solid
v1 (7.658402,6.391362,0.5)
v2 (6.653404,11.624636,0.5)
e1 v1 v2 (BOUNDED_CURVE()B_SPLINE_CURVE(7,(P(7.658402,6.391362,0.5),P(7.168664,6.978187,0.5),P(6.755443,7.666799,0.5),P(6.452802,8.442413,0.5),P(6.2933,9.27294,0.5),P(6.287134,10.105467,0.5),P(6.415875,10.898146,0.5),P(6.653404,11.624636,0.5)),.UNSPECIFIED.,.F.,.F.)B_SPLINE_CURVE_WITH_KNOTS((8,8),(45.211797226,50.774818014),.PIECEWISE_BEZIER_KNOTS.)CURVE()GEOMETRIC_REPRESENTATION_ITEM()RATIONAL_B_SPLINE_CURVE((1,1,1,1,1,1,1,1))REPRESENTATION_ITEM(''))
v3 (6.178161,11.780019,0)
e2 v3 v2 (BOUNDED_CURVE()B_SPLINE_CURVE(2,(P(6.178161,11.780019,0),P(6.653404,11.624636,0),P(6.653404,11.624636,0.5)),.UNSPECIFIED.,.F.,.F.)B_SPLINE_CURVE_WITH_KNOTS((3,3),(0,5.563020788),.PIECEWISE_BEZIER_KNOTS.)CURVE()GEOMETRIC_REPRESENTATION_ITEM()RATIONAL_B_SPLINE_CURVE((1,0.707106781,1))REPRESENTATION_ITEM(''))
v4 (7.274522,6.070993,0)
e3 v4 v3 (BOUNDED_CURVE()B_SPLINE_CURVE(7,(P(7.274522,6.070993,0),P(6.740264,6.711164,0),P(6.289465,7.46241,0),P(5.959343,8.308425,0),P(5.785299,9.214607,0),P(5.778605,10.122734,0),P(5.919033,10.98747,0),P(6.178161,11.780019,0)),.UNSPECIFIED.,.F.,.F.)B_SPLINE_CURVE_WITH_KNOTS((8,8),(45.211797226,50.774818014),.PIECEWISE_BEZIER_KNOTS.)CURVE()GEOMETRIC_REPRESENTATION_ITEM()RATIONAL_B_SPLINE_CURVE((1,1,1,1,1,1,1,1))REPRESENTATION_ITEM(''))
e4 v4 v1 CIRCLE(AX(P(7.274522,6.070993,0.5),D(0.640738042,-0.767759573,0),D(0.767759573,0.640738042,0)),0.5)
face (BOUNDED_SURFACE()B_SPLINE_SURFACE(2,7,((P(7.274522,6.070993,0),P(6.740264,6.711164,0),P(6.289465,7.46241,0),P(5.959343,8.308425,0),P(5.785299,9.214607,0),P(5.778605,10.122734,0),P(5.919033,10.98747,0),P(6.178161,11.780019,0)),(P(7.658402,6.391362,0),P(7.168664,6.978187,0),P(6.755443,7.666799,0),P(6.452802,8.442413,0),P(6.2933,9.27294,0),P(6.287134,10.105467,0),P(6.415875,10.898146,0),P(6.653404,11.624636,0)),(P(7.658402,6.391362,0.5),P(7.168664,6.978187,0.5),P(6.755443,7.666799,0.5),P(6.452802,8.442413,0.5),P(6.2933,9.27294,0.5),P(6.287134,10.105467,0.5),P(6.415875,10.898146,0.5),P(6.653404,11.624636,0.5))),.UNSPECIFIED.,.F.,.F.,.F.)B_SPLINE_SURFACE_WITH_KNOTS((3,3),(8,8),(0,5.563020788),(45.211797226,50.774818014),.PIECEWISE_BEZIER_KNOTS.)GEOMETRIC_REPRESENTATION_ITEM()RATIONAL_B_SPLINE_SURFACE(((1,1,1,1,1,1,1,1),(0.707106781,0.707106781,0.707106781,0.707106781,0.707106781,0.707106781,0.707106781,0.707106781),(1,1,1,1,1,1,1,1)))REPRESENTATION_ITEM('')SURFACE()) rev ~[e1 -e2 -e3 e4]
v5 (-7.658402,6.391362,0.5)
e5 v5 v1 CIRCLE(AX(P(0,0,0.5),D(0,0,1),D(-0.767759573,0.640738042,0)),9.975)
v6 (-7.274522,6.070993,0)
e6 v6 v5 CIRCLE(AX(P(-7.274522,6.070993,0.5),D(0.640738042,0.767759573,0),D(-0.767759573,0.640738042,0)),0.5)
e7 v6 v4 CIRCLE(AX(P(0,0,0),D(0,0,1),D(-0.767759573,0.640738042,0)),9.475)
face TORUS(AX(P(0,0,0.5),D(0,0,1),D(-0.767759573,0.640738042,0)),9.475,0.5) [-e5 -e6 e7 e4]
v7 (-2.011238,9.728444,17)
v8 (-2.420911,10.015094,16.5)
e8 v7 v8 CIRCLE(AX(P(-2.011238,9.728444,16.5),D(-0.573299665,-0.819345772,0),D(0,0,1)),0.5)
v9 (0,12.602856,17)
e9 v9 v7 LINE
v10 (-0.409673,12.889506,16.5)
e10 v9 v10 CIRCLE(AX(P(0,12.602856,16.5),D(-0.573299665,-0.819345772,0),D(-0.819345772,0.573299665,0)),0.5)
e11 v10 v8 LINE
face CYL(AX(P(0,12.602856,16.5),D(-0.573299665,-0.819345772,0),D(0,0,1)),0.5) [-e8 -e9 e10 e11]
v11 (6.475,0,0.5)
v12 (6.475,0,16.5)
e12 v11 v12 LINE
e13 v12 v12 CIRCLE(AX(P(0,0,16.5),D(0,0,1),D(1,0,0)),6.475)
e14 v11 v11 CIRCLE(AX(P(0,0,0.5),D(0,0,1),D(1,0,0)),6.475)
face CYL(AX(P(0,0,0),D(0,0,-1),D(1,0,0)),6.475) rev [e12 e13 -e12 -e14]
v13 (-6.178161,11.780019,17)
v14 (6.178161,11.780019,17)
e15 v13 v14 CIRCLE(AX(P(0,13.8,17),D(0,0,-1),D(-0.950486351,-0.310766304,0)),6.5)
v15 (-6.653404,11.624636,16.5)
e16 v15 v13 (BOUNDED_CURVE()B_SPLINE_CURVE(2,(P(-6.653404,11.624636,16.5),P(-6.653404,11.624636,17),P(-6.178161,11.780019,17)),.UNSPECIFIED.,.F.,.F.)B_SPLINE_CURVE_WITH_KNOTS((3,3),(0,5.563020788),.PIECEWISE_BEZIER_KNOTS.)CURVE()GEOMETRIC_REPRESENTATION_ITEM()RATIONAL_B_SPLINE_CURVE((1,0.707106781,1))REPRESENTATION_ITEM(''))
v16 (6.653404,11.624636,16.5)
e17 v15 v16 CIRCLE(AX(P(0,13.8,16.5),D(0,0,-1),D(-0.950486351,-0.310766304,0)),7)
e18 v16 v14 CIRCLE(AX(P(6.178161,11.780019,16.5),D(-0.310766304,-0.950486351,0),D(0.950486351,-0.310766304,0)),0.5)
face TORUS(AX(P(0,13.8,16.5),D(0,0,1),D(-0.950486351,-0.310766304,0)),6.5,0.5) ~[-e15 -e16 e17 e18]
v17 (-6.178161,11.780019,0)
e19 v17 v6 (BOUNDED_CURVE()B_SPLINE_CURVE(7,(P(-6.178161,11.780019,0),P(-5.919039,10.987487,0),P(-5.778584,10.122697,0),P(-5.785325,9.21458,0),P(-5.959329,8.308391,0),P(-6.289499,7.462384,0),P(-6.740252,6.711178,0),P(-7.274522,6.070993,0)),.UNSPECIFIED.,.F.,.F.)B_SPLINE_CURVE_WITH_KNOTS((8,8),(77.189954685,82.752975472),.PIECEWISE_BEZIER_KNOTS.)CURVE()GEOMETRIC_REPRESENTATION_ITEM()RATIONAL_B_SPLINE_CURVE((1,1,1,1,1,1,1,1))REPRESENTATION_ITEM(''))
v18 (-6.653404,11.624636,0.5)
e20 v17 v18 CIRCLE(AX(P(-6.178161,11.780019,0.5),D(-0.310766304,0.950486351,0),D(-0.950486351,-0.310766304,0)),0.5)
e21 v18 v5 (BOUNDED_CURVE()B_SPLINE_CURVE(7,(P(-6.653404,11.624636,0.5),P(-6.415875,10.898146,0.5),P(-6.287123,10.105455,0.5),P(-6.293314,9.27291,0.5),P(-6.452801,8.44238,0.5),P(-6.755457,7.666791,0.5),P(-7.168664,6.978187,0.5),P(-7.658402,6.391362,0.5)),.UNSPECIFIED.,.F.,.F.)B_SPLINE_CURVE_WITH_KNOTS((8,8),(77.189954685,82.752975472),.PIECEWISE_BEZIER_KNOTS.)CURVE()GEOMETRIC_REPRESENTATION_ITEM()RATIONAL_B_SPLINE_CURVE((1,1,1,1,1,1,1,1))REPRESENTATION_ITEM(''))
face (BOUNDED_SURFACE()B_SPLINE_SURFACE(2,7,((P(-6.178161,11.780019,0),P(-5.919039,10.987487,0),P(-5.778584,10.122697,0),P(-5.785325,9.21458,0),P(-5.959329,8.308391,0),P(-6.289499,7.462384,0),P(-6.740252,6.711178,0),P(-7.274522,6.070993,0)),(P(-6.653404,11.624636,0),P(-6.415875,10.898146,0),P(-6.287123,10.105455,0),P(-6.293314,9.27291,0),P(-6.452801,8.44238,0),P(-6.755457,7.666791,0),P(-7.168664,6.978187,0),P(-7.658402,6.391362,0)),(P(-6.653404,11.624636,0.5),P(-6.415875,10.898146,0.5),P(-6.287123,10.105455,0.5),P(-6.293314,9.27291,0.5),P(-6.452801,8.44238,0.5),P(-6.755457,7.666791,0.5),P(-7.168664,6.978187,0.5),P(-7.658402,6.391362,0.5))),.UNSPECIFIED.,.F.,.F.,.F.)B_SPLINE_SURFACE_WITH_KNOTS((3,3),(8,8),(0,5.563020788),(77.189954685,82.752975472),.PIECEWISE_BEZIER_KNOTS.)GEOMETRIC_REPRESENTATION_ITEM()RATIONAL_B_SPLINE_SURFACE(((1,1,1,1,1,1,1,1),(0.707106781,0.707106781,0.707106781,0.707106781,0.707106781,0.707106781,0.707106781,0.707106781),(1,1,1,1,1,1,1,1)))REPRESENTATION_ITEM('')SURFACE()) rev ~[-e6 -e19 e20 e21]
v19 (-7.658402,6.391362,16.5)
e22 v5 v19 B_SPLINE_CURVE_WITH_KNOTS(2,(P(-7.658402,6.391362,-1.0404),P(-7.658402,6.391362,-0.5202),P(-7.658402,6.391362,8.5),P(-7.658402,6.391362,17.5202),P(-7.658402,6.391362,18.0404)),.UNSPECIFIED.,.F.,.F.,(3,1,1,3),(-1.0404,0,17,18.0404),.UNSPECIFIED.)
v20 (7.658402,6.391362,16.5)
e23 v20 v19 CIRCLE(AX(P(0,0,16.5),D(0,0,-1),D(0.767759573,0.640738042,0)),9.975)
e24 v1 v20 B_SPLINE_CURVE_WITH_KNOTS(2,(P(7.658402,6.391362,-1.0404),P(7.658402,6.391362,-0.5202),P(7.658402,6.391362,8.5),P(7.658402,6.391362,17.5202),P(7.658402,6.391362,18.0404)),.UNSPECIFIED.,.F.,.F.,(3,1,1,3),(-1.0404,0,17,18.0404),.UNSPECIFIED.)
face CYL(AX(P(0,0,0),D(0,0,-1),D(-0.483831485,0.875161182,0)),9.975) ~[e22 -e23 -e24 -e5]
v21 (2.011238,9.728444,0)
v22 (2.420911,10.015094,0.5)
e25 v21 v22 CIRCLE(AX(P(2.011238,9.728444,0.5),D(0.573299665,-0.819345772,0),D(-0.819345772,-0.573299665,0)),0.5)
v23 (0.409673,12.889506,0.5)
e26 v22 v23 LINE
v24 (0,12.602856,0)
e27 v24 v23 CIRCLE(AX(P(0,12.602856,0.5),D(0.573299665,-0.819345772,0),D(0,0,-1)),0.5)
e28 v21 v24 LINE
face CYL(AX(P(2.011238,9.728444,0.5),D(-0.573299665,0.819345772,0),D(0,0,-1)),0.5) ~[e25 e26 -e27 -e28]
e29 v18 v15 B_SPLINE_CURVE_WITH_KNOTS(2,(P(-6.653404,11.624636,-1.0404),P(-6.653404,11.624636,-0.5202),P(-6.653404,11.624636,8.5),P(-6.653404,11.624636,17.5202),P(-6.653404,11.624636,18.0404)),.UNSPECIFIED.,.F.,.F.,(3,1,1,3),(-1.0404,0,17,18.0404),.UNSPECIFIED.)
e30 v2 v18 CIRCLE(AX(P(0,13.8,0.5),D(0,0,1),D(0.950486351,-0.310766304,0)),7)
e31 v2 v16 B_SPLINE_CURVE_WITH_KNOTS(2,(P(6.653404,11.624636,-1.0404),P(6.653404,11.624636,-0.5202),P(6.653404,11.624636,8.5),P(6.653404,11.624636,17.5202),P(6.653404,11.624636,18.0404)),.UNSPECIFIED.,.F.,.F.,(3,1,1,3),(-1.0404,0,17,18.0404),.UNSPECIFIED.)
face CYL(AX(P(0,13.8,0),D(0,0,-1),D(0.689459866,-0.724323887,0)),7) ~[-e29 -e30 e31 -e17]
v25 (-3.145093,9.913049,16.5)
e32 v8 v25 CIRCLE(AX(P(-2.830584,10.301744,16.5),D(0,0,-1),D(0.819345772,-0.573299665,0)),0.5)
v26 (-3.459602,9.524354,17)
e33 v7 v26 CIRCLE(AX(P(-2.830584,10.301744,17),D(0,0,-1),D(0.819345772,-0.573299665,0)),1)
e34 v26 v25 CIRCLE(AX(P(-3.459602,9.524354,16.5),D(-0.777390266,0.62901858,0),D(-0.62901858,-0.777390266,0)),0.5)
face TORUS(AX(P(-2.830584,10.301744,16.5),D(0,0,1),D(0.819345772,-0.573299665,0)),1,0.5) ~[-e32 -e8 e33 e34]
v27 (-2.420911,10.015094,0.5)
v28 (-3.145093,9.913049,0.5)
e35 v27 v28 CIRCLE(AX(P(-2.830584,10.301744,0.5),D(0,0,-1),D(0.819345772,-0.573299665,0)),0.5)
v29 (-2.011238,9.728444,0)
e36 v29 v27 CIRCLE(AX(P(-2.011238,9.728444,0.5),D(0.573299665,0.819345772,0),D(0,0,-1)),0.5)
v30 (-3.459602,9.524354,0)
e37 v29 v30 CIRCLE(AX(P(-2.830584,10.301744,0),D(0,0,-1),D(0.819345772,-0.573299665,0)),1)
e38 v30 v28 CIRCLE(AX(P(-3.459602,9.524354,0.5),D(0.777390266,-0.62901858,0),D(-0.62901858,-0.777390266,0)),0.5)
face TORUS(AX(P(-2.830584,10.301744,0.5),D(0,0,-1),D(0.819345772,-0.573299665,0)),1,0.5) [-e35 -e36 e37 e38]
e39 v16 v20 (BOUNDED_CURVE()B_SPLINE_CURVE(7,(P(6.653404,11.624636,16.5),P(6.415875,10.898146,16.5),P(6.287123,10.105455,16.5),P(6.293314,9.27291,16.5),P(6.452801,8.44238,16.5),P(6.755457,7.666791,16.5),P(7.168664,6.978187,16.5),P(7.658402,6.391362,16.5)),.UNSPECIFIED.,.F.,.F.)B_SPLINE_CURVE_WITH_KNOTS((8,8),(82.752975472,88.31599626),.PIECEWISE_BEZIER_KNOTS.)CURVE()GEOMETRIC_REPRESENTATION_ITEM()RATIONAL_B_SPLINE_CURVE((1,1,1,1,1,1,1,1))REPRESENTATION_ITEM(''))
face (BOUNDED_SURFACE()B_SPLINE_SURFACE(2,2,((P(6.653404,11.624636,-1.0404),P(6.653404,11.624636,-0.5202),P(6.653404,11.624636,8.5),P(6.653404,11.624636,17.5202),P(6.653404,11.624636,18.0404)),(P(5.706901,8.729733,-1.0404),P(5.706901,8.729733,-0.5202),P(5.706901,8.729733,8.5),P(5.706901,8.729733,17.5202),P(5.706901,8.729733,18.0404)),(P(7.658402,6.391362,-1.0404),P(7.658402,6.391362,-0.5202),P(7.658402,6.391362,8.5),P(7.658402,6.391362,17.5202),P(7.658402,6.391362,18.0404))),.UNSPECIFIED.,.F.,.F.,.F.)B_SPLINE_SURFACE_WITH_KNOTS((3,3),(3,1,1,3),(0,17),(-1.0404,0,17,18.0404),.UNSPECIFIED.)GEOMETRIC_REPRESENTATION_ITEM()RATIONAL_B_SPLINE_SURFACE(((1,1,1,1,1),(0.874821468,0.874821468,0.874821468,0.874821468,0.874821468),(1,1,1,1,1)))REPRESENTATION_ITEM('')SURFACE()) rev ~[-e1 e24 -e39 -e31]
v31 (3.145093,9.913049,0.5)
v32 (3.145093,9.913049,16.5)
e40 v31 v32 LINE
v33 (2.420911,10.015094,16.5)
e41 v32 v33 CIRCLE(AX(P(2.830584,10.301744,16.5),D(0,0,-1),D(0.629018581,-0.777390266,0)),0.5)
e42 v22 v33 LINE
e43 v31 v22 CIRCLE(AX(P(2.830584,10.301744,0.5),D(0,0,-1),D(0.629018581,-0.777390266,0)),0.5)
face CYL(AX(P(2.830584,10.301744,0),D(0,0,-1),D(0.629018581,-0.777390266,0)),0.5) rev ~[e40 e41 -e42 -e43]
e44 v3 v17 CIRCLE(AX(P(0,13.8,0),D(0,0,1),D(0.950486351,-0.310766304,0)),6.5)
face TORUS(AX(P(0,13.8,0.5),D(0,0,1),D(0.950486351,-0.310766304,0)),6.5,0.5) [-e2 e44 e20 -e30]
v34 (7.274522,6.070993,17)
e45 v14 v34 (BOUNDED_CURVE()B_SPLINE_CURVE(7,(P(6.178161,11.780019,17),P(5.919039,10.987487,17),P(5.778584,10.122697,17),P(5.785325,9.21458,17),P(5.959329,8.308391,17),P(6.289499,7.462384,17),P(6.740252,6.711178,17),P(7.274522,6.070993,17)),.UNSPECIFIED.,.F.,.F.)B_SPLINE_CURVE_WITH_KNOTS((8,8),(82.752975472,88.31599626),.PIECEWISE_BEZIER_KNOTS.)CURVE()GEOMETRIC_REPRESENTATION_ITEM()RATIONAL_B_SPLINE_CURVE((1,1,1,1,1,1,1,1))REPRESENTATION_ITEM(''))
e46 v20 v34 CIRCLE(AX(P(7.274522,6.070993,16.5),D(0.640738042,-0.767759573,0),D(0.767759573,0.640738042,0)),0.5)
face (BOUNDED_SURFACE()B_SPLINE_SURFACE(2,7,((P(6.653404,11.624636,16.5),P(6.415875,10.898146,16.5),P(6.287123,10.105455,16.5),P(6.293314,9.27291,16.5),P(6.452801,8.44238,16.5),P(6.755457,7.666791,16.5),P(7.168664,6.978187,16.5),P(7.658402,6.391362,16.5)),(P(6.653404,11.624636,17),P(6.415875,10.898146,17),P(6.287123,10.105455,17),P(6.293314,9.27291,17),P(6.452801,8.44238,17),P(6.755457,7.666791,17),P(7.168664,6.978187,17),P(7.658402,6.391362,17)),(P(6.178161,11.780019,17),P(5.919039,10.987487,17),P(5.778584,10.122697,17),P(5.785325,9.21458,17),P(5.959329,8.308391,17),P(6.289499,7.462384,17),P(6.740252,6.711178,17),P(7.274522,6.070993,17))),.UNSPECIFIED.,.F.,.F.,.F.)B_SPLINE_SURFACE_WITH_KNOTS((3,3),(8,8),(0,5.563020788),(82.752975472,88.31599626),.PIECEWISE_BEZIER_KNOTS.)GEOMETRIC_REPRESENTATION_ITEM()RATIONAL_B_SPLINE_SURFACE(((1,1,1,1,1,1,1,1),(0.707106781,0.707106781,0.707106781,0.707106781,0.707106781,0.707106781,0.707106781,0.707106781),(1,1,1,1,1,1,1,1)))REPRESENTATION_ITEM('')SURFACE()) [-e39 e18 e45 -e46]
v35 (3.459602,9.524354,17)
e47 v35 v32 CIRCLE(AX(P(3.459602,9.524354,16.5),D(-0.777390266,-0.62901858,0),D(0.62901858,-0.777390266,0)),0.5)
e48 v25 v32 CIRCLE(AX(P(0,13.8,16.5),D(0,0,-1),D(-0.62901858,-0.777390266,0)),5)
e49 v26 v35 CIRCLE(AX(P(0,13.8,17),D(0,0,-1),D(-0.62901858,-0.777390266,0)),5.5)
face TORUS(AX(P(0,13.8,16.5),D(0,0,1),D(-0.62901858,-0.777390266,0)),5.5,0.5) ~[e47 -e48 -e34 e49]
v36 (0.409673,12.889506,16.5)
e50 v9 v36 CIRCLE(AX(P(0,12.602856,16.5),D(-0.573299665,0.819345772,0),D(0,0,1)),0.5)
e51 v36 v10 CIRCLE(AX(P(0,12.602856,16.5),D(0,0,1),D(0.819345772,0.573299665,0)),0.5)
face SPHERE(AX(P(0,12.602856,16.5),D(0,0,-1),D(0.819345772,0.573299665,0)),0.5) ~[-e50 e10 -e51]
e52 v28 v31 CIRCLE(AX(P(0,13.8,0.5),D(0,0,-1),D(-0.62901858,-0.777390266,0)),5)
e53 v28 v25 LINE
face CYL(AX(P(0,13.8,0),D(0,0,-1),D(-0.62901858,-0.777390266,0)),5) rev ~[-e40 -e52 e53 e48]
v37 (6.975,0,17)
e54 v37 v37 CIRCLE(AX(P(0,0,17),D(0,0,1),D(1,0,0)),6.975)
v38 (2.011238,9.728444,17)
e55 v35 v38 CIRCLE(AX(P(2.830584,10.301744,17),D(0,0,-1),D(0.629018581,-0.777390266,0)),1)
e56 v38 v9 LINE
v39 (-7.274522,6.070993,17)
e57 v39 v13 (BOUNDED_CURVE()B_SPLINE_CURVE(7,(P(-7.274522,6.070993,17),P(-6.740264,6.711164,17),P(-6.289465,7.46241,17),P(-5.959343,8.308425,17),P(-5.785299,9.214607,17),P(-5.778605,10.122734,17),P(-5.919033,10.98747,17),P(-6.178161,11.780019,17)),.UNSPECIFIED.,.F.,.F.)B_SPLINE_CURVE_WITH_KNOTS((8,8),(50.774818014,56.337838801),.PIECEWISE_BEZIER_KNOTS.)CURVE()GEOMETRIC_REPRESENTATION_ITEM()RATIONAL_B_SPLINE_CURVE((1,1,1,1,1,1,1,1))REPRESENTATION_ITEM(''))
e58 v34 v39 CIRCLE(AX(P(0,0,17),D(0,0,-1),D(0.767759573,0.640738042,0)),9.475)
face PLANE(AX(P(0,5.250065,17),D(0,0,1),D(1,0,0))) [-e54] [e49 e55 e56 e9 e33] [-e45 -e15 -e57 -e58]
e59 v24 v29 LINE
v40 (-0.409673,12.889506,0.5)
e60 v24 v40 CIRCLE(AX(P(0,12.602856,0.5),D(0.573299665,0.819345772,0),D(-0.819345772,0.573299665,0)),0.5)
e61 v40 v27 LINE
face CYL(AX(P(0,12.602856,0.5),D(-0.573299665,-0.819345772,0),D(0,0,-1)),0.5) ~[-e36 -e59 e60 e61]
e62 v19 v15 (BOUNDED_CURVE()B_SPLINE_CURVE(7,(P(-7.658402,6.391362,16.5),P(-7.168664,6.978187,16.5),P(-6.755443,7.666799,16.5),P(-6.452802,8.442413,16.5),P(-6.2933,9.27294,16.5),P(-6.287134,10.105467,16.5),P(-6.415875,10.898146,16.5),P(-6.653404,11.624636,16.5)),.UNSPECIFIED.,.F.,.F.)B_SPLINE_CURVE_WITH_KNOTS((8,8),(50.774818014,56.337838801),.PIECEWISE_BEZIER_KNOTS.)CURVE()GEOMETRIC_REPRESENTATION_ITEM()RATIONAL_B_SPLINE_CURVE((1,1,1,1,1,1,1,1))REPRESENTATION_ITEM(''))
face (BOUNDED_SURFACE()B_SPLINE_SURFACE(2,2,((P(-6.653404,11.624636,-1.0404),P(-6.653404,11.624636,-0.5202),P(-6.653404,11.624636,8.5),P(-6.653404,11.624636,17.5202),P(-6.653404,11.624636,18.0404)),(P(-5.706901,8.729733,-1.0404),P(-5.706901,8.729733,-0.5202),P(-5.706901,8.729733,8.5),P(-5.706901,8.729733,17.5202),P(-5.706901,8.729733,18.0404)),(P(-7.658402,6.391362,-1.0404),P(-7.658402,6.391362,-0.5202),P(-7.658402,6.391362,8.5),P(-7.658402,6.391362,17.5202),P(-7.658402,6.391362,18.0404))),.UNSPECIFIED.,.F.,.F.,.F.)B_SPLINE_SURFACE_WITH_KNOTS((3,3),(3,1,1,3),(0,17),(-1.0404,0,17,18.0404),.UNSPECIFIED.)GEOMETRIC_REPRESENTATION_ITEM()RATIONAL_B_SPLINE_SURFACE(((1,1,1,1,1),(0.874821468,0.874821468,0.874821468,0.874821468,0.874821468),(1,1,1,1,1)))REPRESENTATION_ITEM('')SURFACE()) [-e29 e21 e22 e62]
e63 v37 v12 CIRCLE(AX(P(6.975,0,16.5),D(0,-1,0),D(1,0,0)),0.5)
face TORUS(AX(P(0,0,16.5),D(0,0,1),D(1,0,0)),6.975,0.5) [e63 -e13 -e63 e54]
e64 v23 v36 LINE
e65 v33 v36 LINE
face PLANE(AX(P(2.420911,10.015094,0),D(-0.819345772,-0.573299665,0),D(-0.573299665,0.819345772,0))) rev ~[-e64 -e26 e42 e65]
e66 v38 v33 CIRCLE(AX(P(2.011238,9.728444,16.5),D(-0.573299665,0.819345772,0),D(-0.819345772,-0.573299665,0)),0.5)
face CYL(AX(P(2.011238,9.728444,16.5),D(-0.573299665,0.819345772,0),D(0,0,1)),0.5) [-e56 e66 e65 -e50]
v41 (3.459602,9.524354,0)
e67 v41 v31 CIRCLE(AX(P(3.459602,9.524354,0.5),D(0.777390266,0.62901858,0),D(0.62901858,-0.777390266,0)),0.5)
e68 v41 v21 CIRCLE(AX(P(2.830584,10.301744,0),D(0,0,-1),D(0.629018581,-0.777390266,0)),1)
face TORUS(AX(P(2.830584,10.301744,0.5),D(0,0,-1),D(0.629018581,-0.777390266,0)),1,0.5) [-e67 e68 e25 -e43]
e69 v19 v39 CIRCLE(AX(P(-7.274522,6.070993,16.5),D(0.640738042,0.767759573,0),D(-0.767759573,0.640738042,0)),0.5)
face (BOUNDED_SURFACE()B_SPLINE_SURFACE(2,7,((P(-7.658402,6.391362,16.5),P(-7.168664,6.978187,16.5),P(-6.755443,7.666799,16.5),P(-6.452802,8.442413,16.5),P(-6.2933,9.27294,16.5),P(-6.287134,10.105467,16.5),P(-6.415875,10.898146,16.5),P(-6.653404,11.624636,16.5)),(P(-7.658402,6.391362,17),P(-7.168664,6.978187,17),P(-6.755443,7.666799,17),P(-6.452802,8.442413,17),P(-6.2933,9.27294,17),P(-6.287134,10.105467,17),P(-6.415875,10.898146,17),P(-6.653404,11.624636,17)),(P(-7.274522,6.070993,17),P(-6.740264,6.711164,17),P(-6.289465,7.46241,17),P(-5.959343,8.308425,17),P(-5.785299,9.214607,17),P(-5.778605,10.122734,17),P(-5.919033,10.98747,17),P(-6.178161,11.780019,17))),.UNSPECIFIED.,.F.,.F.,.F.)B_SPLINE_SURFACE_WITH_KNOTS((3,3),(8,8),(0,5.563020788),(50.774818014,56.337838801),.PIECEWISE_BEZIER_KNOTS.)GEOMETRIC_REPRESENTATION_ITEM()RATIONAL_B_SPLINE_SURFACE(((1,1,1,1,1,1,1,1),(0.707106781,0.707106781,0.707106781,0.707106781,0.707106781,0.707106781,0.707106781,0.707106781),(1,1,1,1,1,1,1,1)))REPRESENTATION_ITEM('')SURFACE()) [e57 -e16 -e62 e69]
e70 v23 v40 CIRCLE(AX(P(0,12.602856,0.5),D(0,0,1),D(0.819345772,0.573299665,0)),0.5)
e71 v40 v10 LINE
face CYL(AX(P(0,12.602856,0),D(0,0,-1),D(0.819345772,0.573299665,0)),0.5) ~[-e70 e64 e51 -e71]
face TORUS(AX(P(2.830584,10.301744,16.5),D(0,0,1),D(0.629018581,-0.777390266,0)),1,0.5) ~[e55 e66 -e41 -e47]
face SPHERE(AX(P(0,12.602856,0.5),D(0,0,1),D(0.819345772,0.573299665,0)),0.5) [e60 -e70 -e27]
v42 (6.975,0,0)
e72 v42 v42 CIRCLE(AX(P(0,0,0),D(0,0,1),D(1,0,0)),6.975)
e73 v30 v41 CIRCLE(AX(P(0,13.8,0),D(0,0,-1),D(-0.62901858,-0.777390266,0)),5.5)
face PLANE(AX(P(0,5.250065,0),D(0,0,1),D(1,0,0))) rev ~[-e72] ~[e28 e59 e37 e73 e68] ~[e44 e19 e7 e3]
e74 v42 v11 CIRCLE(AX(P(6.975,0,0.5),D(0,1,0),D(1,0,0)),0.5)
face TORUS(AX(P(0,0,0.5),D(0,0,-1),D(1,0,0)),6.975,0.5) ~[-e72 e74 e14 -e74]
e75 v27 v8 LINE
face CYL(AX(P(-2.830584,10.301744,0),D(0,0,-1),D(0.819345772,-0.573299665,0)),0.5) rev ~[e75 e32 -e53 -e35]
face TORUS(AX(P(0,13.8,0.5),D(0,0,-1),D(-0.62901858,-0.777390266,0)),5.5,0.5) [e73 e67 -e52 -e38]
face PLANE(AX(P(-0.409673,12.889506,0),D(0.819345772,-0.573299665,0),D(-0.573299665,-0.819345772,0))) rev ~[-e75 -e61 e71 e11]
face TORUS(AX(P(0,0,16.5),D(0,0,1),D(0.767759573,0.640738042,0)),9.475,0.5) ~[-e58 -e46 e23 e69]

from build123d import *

# Parameters (mm, degrees)
F0_R     = 6.475
F1_DEPTH = 17
F2_R     = 5.5
F3_R     = 0.5


with BuildPart() as f1:
    # F0 (on Top) → F1 (new body)
    with BuildSketch(Plane.XY):
        with BuildLine():
            ThreePointArc((4.8262190603, 8.7297327899), (0, 20.8), (-4.8262190603, 8.7297327899))
            ThreePointArc((-4.8262190603, 8.7297327899), (0, -9.975), (4.8262190603, 8.7297327899))
        make_face()
        Circle(F0_R, mode=Mode.SUBTRACT)
        with BuildLine():
            ThreePointArc((-3.1450929018, 9.9130486704), (0, 18.8), (3.1450929018, 9.9130486704))
            ThreePointArc((3.1450929018, 9.9130486704), (2.7608172994, 9.8066350661), (2.4209107257, 10.0150939708))
            Line((2.4209107257, 10.0150939708), (0.409672886, 12.8895055936))
            ThreePointArc((0.409672886, 12.8895055936), (0, 13.1028557611), (-0.409672886, 12.8895055936))
            Line((-0.409672886, 12.8895055936), (-2.4209107257, 10.0150939708))
            ThreePointArc((-2.4209107257, 10.0150939708), (-2.7608172994, 9.8066350661), (-3.1450929018, 9.9130486704))
        make_face(mode=Mode.SUBTRACT)
    extrude(amount=F1_DEPTH)

    # F2
    f2_edges = [f1.edges().sort_by_distance(p)[0] for p in [
        (-4.826219, 8.729733, 8.5),
        (4.826219, 8.729733, 8.5),
    ]]
    fillet(f2_edges, radius=F2_R)

    # F3
    f3_edges = [f1.edges().sort_by_distance(p)[0] for p in [
        (0, 18.8, 17),
        (-1.415292, 11.4523, 17),
        (-2.760817, 9.806635, 17),
        (1.415292, 11.4523, 17),
        (0, 13.102856, 17),
        (2.760817, 9.806635, 17),
        (6.479776, 8.878156, 17),
        (0, 20.8, 17),
        (-6.475, 0, 17),
        (-6.475, 0, 0),
        (0, 18.8, 0),
        (0, -9.975, 0),
        (0, -9.975, 17),
        (-6.479776, 8.878156, 0),
        (6.479776, 8.878156, 0),
        (0, 20.8, 0),
        (-2.760817, 9.806635, 0),
        (2.760817, 9.806635, 0),
        (1.415292, 11.4523, 0),
        (0, 13.102856, 0),
        (-1.415292, 11.4523, 0),
        (-6.479776, 8.878156, 17),
    ]]
    fillet(f3_edges, radius=F3_R)


solid = f1.part
